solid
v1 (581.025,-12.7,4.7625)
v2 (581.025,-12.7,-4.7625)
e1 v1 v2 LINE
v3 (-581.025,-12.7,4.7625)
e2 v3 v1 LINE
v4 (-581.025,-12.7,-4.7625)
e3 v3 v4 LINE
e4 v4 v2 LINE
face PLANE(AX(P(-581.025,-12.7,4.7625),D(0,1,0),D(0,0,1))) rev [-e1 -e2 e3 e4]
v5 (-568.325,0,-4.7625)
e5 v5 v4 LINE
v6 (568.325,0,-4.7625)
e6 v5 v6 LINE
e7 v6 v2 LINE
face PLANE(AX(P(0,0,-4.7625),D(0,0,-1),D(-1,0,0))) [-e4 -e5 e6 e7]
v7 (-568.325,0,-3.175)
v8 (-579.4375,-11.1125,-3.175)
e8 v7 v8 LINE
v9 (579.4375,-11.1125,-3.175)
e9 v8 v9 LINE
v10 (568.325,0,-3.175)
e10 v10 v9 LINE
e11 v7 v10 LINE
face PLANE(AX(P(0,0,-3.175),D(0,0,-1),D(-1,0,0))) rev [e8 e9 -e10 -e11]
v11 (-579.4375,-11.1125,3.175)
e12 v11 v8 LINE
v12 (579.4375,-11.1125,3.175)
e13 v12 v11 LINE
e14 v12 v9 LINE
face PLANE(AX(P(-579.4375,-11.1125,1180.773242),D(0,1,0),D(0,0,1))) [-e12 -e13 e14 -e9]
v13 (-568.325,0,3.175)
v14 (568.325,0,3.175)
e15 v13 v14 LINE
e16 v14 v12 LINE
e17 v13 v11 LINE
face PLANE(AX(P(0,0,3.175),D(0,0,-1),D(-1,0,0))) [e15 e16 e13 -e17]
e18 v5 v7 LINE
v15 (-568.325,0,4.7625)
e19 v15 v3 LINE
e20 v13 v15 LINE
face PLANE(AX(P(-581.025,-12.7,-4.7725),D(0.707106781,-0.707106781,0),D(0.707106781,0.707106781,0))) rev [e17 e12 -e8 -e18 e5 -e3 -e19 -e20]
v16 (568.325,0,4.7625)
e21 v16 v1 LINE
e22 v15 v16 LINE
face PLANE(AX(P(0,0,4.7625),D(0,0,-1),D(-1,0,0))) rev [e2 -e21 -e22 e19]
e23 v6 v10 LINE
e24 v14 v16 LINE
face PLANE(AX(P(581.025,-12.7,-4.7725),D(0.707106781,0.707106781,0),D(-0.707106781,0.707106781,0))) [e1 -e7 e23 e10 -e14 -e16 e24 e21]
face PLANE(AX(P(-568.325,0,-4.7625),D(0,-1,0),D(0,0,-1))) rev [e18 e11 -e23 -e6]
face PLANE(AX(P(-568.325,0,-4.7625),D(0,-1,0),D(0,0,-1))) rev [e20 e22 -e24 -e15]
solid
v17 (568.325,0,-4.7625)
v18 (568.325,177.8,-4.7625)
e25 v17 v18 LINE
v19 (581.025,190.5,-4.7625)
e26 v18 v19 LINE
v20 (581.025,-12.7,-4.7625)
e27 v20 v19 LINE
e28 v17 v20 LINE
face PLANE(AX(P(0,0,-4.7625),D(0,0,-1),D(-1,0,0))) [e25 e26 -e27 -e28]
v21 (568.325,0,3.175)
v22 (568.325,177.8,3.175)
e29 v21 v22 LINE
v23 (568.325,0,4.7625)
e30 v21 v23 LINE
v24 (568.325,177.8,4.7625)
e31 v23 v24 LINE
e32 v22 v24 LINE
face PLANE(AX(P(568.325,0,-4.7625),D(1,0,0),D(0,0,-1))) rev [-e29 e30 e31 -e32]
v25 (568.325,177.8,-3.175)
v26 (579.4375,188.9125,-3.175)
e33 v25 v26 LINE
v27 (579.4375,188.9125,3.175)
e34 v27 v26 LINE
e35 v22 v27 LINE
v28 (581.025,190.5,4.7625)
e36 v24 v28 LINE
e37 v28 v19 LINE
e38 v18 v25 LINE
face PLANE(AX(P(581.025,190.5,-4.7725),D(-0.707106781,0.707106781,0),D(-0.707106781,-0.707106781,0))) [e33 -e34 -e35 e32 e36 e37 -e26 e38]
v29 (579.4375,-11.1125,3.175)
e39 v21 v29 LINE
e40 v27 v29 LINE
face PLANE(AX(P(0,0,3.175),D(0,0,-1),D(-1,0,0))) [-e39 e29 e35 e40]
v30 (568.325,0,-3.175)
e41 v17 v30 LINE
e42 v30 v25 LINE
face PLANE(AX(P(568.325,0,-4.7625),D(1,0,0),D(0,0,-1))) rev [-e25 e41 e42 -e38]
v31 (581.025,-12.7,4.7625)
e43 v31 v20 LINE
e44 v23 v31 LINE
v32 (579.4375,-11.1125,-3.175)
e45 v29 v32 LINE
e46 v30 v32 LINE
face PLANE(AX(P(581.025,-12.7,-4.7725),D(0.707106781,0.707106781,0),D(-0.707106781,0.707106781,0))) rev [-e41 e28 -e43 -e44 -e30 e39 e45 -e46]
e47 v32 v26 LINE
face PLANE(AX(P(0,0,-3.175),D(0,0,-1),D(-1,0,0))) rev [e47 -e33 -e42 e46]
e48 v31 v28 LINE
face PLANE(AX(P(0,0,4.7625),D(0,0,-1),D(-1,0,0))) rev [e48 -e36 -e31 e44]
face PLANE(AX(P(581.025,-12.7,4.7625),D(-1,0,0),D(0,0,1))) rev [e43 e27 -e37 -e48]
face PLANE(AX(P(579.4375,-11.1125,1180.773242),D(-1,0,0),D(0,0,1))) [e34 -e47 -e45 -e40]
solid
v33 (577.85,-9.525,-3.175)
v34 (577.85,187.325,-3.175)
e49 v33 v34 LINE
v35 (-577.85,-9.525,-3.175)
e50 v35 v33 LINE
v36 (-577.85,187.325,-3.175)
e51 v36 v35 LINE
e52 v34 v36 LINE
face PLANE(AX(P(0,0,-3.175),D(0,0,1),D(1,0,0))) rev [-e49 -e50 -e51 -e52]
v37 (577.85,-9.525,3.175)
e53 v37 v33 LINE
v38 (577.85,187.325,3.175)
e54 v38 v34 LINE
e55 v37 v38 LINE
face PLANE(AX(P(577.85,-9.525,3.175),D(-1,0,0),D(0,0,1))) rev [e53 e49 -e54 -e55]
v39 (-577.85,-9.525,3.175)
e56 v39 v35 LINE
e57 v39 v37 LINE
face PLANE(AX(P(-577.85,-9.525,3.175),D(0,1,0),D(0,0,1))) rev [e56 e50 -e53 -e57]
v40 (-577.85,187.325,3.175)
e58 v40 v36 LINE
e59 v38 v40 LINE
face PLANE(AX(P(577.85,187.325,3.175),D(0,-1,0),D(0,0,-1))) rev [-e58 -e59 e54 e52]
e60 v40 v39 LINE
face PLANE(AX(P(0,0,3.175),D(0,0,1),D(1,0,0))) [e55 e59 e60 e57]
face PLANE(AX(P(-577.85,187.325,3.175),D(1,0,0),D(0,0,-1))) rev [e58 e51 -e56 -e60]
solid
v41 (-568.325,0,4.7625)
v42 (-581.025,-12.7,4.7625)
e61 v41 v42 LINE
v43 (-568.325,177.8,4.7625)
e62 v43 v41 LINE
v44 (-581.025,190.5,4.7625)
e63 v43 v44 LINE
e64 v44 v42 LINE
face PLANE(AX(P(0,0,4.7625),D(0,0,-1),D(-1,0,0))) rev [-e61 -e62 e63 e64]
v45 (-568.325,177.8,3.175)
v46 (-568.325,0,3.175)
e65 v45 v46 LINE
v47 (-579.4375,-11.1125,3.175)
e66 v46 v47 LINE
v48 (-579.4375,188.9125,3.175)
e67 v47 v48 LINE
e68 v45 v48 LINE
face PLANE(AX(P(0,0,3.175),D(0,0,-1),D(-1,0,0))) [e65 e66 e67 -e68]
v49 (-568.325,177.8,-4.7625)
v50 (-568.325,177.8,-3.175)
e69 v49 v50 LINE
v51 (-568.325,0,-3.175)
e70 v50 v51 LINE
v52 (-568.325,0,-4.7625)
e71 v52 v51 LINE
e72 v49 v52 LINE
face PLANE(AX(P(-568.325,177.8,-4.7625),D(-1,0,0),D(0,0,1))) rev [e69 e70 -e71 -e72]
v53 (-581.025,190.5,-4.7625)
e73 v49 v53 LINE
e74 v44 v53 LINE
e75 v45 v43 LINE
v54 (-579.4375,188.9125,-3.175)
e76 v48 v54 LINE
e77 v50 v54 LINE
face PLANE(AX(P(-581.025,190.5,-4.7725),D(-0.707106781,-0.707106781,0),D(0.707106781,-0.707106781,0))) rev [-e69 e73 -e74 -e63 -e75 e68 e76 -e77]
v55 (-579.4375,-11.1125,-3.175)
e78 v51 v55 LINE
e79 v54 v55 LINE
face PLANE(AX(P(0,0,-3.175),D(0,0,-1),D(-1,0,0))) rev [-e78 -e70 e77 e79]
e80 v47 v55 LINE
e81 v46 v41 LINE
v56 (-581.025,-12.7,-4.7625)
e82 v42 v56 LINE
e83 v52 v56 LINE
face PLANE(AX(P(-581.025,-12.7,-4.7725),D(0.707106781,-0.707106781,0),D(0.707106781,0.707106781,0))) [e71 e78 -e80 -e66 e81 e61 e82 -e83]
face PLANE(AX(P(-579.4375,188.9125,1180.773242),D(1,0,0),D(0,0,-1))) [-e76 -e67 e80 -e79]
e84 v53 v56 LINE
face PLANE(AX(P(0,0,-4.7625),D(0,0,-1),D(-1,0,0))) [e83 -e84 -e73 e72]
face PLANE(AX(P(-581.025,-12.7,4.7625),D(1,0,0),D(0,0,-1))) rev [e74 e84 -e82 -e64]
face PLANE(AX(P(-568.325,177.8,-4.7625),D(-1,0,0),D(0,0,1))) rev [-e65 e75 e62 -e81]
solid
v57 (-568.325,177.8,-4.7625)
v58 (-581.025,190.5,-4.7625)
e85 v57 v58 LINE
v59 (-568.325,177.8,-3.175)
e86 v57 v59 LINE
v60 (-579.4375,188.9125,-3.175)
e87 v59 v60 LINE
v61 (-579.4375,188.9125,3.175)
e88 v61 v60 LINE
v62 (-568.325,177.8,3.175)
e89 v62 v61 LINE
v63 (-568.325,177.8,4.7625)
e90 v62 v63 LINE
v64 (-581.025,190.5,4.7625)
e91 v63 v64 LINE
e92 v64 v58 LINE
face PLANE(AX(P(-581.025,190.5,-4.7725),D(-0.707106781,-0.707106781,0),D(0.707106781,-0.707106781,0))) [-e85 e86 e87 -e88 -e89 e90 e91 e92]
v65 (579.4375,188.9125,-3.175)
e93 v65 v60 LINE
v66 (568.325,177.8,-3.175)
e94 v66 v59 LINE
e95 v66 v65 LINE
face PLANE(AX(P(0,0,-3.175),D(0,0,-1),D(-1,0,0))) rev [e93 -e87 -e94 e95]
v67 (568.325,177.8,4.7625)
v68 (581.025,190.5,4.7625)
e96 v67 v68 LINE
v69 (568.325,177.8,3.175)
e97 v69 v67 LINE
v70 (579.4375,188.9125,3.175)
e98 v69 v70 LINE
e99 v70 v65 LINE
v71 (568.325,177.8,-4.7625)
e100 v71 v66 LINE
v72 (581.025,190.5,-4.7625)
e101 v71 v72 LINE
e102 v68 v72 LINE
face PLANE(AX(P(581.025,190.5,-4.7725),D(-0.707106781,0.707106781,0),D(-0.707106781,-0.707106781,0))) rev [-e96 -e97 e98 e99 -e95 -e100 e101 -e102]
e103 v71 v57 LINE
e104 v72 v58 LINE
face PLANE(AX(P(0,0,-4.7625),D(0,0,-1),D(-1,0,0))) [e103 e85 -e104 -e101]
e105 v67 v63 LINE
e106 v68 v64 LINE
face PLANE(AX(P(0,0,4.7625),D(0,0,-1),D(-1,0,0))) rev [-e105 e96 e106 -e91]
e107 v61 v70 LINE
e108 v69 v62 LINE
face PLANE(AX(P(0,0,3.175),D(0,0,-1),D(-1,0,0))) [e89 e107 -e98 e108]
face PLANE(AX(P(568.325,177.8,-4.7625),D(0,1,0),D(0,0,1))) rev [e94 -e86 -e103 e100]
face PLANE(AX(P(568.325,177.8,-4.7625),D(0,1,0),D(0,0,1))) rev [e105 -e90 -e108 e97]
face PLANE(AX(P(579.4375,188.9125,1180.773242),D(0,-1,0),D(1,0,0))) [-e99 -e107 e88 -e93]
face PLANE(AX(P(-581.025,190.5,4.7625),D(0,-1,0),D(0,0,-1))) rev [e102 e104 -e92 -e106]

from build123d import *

# Parameters (mm, degrees)
SKETCH2_W               = 1162.05
SKETCH2_H               = 203.2
BOSS_EXTRUDE1_DEPTH     = 4.7625
SKETCH3_W               = 1136.65
SKETCH3_H               = 177.8
CUT_EXTRUDE1_DEPTH      = 612.531705024
CUT_EXTRUDE2_DEPTH      = 3.175
CUT_EXTRUDE2_DEPTH_BACK = 3.175
SKETCH4_W               = 1158.875
SKETCH4_H               = 200.025
SPLIT1_START            = -4.7625
SPLIT1_DEPTH            = 1.5875
SPLIT1_START_2          = 3.175
SPLIT1_2_DEPTH          = 1.5875
SPLIT1_START_3          = -3.175
SPLIT1_3_DEPTH          = 6.35
SPLIT1_4_DEPTH          = 9.525
SPLIT1_5_DEPTH          = 1.5875
SPLIT1_6_DEPTH          = 1.5875
SPLIT1_7_DEPTH          = 6.35
SPLIT1_8_DEPTH          = 1.5875
SPLIT1_9_DEPTH          = 1.5875
SPLIT1_10_DEPTH         = 6.35
SKETCH6_W               = 1155.7
SKETCH6_H               = 196.85
BOSS_EXTRUDE2_DEPTH     = 3.175


# Read off the part's stored shape, not the designer's step: Split1
with BuildPart() as part:
    # Sketch2 → Boss-Extrude1 (new, symmetric)
    with BuildSketch(Plane.XY):
        with Locations((0, 88.9)):
            Rectangle(SKETCH2_W, SKETCH2_H)
    extrude(amount=BOSS_EXTRUDE1_DEPTH, both=True)

    # Sketch3 → Cut-Extrude1 (cut, through all)
    with BuildSketch(Plane.XY.offset(4.7625)):
        with Locations((0, 88.9)):
            Rectangle(SKETCH3_W, SKETCH3_H)
    extrude(amount=-CUT_EXTRUDE1_DEPTH, mode=Mode.SUBTRACT)

    # Sketch4 → Cut-Extrude2 (cut, two sides: drawn at the far end of the back side and taken through both)
    with BuildSketch(Plane.XY.offset(-CUT_EXTRUDE2_DEPTH_BACK)):
        with Locations((0, 88.9)):
            Rectangle(SKETCH4_W, SKETCH4_H)
    extrude(amount=CUT_EXTRUDE2_DEPTH + CUT_EXTRUDE2_DEPTH_BACK, mode=Mode.SUBTRACT)

    # Split1 4 outline → Split1 4 (cut)
    with BuildSketch(Plane.XY.offset(SPLIT1_START)):
        Polygon((581.025, -12.7), (581.025, 190.5), (568.325, 177.8), (568.325, 0), (-568.325, 0), (-568.325, 177.8), (-581.025, 190.5), (-581.025, -12.7), align=None)
    extrude(amount=SPLIT1_4_DEPTH, mode=Mode.SUBTRACT)


with BuildPart() as body_2:
    # Split1 outline → Split1 (new body)
    with BuildSketch(Plane.XY.offset(SPLIT1_START)):
        Polygon((-581.025, 190.5), (-581.025, -12.7), (-568.325, 0), (-568.325, 177.8), align=None)
    extrude(amount=SPLIT1_DEPTH)

    # Split1 2 outline → Split1 2 (add)
    with BuildSketch(Plane.XY.offset(SPLIT1_START_2)):
        Polygon((-581.025, 190.5), (-581.025, -12.7), (-568.325, 0), (-568.325, 177.8), align=None)
    extrude(amount=SPLIT1_2_DEPTH)

    # Split1 3 outline → Split1 3 (add)
    with BuildSketch(Plane.XY.offset(SPLIT1_START_3)):
        Polygon((-579.4375, 188.9125), (-581.025, 190.5), (-581.025, -12.7), (-579.4375, -11.1125), align=None)
    extrude(amount=SPLIT1_3_DEPTH)


with BuildPart() as body_3:
    # Split1 5 outline → Split1 5 (new body)
    with BuildSketch(Plane.XY.offset(SPLIT1_START)):
        Polygon((581.025, -12.7), (581.025, 190.5), (568.325, 177.8), (568.325, 0), align=None)
    extrude(amount=SPLIT1_5_DEPTH)

    # Split1 6 outline → Split1 6 (add)
    with BuildSketch(Plane.XY.offset(SPLIT1_START_2)):
        Polygon((581.025, -12.7), (581.025, 190.5), (568.325, 177.8), (568.325, 0), align=None)
    extrude(amount=SPLIT1_6_DEPTH)

    # Split1 7 outline → Split1 7 (add)
    with BuildSketch(Plane.XY.offset(SPLIT1_START_3)):
        Polygon((579.4375, -11.1125), (581.025, -12.7), (581.025, 190.5), (579.4375, 188.9125), align=None)
    extrude(amount=SPLIT1_7_DEPTH)


with BuildPart() as body_4:
    # Split1 8 outline → Split1 8 (new body)
    with BuildSketch(Plane.XY.offset(SPLIT1_START)):
        Polygon((-581.025, -12.7), (581.025, -12.7), (568.325, 0), (-568.325, 0), align=None)
    extrude(amount=SPLIT1_8_DEPTH)

    # Split1 9 outline → Split1 9 (add)
    with BuildSketch(Plane.XY.offset(SPLIT1_START_2)):
        Polygon((-581.025, -12.7), (581.025, -12.7), (568.325, 0), (-568.325, 0), align=None)
    extrude(amount=SPLIT1_9_DEPTH)

    # Split1 10 outline → Split1 10 (add)
    with BuildSketch(Plane.XY.offset(SPLIT1_START_3)):
        Polygon((-579.4375, -11.1125), (-581.025, -12.7), (581.025, -12.7), (579.4375, -11.1125), align=None)
    extrude(amount=SPLIT1_10_DEPTH)


with BuildPart() as body_5:
    # Sketch6 → Boss-Extrude2 (new, symmetric)
    with BuildSketch(Plane.XY):
        with Locations((0, 88.9)):
            Rectangle(SKETCH6_W, SKETCH6_H)
    extrude(amount=BOSS_EXTRUDE2_DEPTH, both=True)


solid = Compound([part.part, body_2.part, body_3.part, body_4.part, body_5.part])
